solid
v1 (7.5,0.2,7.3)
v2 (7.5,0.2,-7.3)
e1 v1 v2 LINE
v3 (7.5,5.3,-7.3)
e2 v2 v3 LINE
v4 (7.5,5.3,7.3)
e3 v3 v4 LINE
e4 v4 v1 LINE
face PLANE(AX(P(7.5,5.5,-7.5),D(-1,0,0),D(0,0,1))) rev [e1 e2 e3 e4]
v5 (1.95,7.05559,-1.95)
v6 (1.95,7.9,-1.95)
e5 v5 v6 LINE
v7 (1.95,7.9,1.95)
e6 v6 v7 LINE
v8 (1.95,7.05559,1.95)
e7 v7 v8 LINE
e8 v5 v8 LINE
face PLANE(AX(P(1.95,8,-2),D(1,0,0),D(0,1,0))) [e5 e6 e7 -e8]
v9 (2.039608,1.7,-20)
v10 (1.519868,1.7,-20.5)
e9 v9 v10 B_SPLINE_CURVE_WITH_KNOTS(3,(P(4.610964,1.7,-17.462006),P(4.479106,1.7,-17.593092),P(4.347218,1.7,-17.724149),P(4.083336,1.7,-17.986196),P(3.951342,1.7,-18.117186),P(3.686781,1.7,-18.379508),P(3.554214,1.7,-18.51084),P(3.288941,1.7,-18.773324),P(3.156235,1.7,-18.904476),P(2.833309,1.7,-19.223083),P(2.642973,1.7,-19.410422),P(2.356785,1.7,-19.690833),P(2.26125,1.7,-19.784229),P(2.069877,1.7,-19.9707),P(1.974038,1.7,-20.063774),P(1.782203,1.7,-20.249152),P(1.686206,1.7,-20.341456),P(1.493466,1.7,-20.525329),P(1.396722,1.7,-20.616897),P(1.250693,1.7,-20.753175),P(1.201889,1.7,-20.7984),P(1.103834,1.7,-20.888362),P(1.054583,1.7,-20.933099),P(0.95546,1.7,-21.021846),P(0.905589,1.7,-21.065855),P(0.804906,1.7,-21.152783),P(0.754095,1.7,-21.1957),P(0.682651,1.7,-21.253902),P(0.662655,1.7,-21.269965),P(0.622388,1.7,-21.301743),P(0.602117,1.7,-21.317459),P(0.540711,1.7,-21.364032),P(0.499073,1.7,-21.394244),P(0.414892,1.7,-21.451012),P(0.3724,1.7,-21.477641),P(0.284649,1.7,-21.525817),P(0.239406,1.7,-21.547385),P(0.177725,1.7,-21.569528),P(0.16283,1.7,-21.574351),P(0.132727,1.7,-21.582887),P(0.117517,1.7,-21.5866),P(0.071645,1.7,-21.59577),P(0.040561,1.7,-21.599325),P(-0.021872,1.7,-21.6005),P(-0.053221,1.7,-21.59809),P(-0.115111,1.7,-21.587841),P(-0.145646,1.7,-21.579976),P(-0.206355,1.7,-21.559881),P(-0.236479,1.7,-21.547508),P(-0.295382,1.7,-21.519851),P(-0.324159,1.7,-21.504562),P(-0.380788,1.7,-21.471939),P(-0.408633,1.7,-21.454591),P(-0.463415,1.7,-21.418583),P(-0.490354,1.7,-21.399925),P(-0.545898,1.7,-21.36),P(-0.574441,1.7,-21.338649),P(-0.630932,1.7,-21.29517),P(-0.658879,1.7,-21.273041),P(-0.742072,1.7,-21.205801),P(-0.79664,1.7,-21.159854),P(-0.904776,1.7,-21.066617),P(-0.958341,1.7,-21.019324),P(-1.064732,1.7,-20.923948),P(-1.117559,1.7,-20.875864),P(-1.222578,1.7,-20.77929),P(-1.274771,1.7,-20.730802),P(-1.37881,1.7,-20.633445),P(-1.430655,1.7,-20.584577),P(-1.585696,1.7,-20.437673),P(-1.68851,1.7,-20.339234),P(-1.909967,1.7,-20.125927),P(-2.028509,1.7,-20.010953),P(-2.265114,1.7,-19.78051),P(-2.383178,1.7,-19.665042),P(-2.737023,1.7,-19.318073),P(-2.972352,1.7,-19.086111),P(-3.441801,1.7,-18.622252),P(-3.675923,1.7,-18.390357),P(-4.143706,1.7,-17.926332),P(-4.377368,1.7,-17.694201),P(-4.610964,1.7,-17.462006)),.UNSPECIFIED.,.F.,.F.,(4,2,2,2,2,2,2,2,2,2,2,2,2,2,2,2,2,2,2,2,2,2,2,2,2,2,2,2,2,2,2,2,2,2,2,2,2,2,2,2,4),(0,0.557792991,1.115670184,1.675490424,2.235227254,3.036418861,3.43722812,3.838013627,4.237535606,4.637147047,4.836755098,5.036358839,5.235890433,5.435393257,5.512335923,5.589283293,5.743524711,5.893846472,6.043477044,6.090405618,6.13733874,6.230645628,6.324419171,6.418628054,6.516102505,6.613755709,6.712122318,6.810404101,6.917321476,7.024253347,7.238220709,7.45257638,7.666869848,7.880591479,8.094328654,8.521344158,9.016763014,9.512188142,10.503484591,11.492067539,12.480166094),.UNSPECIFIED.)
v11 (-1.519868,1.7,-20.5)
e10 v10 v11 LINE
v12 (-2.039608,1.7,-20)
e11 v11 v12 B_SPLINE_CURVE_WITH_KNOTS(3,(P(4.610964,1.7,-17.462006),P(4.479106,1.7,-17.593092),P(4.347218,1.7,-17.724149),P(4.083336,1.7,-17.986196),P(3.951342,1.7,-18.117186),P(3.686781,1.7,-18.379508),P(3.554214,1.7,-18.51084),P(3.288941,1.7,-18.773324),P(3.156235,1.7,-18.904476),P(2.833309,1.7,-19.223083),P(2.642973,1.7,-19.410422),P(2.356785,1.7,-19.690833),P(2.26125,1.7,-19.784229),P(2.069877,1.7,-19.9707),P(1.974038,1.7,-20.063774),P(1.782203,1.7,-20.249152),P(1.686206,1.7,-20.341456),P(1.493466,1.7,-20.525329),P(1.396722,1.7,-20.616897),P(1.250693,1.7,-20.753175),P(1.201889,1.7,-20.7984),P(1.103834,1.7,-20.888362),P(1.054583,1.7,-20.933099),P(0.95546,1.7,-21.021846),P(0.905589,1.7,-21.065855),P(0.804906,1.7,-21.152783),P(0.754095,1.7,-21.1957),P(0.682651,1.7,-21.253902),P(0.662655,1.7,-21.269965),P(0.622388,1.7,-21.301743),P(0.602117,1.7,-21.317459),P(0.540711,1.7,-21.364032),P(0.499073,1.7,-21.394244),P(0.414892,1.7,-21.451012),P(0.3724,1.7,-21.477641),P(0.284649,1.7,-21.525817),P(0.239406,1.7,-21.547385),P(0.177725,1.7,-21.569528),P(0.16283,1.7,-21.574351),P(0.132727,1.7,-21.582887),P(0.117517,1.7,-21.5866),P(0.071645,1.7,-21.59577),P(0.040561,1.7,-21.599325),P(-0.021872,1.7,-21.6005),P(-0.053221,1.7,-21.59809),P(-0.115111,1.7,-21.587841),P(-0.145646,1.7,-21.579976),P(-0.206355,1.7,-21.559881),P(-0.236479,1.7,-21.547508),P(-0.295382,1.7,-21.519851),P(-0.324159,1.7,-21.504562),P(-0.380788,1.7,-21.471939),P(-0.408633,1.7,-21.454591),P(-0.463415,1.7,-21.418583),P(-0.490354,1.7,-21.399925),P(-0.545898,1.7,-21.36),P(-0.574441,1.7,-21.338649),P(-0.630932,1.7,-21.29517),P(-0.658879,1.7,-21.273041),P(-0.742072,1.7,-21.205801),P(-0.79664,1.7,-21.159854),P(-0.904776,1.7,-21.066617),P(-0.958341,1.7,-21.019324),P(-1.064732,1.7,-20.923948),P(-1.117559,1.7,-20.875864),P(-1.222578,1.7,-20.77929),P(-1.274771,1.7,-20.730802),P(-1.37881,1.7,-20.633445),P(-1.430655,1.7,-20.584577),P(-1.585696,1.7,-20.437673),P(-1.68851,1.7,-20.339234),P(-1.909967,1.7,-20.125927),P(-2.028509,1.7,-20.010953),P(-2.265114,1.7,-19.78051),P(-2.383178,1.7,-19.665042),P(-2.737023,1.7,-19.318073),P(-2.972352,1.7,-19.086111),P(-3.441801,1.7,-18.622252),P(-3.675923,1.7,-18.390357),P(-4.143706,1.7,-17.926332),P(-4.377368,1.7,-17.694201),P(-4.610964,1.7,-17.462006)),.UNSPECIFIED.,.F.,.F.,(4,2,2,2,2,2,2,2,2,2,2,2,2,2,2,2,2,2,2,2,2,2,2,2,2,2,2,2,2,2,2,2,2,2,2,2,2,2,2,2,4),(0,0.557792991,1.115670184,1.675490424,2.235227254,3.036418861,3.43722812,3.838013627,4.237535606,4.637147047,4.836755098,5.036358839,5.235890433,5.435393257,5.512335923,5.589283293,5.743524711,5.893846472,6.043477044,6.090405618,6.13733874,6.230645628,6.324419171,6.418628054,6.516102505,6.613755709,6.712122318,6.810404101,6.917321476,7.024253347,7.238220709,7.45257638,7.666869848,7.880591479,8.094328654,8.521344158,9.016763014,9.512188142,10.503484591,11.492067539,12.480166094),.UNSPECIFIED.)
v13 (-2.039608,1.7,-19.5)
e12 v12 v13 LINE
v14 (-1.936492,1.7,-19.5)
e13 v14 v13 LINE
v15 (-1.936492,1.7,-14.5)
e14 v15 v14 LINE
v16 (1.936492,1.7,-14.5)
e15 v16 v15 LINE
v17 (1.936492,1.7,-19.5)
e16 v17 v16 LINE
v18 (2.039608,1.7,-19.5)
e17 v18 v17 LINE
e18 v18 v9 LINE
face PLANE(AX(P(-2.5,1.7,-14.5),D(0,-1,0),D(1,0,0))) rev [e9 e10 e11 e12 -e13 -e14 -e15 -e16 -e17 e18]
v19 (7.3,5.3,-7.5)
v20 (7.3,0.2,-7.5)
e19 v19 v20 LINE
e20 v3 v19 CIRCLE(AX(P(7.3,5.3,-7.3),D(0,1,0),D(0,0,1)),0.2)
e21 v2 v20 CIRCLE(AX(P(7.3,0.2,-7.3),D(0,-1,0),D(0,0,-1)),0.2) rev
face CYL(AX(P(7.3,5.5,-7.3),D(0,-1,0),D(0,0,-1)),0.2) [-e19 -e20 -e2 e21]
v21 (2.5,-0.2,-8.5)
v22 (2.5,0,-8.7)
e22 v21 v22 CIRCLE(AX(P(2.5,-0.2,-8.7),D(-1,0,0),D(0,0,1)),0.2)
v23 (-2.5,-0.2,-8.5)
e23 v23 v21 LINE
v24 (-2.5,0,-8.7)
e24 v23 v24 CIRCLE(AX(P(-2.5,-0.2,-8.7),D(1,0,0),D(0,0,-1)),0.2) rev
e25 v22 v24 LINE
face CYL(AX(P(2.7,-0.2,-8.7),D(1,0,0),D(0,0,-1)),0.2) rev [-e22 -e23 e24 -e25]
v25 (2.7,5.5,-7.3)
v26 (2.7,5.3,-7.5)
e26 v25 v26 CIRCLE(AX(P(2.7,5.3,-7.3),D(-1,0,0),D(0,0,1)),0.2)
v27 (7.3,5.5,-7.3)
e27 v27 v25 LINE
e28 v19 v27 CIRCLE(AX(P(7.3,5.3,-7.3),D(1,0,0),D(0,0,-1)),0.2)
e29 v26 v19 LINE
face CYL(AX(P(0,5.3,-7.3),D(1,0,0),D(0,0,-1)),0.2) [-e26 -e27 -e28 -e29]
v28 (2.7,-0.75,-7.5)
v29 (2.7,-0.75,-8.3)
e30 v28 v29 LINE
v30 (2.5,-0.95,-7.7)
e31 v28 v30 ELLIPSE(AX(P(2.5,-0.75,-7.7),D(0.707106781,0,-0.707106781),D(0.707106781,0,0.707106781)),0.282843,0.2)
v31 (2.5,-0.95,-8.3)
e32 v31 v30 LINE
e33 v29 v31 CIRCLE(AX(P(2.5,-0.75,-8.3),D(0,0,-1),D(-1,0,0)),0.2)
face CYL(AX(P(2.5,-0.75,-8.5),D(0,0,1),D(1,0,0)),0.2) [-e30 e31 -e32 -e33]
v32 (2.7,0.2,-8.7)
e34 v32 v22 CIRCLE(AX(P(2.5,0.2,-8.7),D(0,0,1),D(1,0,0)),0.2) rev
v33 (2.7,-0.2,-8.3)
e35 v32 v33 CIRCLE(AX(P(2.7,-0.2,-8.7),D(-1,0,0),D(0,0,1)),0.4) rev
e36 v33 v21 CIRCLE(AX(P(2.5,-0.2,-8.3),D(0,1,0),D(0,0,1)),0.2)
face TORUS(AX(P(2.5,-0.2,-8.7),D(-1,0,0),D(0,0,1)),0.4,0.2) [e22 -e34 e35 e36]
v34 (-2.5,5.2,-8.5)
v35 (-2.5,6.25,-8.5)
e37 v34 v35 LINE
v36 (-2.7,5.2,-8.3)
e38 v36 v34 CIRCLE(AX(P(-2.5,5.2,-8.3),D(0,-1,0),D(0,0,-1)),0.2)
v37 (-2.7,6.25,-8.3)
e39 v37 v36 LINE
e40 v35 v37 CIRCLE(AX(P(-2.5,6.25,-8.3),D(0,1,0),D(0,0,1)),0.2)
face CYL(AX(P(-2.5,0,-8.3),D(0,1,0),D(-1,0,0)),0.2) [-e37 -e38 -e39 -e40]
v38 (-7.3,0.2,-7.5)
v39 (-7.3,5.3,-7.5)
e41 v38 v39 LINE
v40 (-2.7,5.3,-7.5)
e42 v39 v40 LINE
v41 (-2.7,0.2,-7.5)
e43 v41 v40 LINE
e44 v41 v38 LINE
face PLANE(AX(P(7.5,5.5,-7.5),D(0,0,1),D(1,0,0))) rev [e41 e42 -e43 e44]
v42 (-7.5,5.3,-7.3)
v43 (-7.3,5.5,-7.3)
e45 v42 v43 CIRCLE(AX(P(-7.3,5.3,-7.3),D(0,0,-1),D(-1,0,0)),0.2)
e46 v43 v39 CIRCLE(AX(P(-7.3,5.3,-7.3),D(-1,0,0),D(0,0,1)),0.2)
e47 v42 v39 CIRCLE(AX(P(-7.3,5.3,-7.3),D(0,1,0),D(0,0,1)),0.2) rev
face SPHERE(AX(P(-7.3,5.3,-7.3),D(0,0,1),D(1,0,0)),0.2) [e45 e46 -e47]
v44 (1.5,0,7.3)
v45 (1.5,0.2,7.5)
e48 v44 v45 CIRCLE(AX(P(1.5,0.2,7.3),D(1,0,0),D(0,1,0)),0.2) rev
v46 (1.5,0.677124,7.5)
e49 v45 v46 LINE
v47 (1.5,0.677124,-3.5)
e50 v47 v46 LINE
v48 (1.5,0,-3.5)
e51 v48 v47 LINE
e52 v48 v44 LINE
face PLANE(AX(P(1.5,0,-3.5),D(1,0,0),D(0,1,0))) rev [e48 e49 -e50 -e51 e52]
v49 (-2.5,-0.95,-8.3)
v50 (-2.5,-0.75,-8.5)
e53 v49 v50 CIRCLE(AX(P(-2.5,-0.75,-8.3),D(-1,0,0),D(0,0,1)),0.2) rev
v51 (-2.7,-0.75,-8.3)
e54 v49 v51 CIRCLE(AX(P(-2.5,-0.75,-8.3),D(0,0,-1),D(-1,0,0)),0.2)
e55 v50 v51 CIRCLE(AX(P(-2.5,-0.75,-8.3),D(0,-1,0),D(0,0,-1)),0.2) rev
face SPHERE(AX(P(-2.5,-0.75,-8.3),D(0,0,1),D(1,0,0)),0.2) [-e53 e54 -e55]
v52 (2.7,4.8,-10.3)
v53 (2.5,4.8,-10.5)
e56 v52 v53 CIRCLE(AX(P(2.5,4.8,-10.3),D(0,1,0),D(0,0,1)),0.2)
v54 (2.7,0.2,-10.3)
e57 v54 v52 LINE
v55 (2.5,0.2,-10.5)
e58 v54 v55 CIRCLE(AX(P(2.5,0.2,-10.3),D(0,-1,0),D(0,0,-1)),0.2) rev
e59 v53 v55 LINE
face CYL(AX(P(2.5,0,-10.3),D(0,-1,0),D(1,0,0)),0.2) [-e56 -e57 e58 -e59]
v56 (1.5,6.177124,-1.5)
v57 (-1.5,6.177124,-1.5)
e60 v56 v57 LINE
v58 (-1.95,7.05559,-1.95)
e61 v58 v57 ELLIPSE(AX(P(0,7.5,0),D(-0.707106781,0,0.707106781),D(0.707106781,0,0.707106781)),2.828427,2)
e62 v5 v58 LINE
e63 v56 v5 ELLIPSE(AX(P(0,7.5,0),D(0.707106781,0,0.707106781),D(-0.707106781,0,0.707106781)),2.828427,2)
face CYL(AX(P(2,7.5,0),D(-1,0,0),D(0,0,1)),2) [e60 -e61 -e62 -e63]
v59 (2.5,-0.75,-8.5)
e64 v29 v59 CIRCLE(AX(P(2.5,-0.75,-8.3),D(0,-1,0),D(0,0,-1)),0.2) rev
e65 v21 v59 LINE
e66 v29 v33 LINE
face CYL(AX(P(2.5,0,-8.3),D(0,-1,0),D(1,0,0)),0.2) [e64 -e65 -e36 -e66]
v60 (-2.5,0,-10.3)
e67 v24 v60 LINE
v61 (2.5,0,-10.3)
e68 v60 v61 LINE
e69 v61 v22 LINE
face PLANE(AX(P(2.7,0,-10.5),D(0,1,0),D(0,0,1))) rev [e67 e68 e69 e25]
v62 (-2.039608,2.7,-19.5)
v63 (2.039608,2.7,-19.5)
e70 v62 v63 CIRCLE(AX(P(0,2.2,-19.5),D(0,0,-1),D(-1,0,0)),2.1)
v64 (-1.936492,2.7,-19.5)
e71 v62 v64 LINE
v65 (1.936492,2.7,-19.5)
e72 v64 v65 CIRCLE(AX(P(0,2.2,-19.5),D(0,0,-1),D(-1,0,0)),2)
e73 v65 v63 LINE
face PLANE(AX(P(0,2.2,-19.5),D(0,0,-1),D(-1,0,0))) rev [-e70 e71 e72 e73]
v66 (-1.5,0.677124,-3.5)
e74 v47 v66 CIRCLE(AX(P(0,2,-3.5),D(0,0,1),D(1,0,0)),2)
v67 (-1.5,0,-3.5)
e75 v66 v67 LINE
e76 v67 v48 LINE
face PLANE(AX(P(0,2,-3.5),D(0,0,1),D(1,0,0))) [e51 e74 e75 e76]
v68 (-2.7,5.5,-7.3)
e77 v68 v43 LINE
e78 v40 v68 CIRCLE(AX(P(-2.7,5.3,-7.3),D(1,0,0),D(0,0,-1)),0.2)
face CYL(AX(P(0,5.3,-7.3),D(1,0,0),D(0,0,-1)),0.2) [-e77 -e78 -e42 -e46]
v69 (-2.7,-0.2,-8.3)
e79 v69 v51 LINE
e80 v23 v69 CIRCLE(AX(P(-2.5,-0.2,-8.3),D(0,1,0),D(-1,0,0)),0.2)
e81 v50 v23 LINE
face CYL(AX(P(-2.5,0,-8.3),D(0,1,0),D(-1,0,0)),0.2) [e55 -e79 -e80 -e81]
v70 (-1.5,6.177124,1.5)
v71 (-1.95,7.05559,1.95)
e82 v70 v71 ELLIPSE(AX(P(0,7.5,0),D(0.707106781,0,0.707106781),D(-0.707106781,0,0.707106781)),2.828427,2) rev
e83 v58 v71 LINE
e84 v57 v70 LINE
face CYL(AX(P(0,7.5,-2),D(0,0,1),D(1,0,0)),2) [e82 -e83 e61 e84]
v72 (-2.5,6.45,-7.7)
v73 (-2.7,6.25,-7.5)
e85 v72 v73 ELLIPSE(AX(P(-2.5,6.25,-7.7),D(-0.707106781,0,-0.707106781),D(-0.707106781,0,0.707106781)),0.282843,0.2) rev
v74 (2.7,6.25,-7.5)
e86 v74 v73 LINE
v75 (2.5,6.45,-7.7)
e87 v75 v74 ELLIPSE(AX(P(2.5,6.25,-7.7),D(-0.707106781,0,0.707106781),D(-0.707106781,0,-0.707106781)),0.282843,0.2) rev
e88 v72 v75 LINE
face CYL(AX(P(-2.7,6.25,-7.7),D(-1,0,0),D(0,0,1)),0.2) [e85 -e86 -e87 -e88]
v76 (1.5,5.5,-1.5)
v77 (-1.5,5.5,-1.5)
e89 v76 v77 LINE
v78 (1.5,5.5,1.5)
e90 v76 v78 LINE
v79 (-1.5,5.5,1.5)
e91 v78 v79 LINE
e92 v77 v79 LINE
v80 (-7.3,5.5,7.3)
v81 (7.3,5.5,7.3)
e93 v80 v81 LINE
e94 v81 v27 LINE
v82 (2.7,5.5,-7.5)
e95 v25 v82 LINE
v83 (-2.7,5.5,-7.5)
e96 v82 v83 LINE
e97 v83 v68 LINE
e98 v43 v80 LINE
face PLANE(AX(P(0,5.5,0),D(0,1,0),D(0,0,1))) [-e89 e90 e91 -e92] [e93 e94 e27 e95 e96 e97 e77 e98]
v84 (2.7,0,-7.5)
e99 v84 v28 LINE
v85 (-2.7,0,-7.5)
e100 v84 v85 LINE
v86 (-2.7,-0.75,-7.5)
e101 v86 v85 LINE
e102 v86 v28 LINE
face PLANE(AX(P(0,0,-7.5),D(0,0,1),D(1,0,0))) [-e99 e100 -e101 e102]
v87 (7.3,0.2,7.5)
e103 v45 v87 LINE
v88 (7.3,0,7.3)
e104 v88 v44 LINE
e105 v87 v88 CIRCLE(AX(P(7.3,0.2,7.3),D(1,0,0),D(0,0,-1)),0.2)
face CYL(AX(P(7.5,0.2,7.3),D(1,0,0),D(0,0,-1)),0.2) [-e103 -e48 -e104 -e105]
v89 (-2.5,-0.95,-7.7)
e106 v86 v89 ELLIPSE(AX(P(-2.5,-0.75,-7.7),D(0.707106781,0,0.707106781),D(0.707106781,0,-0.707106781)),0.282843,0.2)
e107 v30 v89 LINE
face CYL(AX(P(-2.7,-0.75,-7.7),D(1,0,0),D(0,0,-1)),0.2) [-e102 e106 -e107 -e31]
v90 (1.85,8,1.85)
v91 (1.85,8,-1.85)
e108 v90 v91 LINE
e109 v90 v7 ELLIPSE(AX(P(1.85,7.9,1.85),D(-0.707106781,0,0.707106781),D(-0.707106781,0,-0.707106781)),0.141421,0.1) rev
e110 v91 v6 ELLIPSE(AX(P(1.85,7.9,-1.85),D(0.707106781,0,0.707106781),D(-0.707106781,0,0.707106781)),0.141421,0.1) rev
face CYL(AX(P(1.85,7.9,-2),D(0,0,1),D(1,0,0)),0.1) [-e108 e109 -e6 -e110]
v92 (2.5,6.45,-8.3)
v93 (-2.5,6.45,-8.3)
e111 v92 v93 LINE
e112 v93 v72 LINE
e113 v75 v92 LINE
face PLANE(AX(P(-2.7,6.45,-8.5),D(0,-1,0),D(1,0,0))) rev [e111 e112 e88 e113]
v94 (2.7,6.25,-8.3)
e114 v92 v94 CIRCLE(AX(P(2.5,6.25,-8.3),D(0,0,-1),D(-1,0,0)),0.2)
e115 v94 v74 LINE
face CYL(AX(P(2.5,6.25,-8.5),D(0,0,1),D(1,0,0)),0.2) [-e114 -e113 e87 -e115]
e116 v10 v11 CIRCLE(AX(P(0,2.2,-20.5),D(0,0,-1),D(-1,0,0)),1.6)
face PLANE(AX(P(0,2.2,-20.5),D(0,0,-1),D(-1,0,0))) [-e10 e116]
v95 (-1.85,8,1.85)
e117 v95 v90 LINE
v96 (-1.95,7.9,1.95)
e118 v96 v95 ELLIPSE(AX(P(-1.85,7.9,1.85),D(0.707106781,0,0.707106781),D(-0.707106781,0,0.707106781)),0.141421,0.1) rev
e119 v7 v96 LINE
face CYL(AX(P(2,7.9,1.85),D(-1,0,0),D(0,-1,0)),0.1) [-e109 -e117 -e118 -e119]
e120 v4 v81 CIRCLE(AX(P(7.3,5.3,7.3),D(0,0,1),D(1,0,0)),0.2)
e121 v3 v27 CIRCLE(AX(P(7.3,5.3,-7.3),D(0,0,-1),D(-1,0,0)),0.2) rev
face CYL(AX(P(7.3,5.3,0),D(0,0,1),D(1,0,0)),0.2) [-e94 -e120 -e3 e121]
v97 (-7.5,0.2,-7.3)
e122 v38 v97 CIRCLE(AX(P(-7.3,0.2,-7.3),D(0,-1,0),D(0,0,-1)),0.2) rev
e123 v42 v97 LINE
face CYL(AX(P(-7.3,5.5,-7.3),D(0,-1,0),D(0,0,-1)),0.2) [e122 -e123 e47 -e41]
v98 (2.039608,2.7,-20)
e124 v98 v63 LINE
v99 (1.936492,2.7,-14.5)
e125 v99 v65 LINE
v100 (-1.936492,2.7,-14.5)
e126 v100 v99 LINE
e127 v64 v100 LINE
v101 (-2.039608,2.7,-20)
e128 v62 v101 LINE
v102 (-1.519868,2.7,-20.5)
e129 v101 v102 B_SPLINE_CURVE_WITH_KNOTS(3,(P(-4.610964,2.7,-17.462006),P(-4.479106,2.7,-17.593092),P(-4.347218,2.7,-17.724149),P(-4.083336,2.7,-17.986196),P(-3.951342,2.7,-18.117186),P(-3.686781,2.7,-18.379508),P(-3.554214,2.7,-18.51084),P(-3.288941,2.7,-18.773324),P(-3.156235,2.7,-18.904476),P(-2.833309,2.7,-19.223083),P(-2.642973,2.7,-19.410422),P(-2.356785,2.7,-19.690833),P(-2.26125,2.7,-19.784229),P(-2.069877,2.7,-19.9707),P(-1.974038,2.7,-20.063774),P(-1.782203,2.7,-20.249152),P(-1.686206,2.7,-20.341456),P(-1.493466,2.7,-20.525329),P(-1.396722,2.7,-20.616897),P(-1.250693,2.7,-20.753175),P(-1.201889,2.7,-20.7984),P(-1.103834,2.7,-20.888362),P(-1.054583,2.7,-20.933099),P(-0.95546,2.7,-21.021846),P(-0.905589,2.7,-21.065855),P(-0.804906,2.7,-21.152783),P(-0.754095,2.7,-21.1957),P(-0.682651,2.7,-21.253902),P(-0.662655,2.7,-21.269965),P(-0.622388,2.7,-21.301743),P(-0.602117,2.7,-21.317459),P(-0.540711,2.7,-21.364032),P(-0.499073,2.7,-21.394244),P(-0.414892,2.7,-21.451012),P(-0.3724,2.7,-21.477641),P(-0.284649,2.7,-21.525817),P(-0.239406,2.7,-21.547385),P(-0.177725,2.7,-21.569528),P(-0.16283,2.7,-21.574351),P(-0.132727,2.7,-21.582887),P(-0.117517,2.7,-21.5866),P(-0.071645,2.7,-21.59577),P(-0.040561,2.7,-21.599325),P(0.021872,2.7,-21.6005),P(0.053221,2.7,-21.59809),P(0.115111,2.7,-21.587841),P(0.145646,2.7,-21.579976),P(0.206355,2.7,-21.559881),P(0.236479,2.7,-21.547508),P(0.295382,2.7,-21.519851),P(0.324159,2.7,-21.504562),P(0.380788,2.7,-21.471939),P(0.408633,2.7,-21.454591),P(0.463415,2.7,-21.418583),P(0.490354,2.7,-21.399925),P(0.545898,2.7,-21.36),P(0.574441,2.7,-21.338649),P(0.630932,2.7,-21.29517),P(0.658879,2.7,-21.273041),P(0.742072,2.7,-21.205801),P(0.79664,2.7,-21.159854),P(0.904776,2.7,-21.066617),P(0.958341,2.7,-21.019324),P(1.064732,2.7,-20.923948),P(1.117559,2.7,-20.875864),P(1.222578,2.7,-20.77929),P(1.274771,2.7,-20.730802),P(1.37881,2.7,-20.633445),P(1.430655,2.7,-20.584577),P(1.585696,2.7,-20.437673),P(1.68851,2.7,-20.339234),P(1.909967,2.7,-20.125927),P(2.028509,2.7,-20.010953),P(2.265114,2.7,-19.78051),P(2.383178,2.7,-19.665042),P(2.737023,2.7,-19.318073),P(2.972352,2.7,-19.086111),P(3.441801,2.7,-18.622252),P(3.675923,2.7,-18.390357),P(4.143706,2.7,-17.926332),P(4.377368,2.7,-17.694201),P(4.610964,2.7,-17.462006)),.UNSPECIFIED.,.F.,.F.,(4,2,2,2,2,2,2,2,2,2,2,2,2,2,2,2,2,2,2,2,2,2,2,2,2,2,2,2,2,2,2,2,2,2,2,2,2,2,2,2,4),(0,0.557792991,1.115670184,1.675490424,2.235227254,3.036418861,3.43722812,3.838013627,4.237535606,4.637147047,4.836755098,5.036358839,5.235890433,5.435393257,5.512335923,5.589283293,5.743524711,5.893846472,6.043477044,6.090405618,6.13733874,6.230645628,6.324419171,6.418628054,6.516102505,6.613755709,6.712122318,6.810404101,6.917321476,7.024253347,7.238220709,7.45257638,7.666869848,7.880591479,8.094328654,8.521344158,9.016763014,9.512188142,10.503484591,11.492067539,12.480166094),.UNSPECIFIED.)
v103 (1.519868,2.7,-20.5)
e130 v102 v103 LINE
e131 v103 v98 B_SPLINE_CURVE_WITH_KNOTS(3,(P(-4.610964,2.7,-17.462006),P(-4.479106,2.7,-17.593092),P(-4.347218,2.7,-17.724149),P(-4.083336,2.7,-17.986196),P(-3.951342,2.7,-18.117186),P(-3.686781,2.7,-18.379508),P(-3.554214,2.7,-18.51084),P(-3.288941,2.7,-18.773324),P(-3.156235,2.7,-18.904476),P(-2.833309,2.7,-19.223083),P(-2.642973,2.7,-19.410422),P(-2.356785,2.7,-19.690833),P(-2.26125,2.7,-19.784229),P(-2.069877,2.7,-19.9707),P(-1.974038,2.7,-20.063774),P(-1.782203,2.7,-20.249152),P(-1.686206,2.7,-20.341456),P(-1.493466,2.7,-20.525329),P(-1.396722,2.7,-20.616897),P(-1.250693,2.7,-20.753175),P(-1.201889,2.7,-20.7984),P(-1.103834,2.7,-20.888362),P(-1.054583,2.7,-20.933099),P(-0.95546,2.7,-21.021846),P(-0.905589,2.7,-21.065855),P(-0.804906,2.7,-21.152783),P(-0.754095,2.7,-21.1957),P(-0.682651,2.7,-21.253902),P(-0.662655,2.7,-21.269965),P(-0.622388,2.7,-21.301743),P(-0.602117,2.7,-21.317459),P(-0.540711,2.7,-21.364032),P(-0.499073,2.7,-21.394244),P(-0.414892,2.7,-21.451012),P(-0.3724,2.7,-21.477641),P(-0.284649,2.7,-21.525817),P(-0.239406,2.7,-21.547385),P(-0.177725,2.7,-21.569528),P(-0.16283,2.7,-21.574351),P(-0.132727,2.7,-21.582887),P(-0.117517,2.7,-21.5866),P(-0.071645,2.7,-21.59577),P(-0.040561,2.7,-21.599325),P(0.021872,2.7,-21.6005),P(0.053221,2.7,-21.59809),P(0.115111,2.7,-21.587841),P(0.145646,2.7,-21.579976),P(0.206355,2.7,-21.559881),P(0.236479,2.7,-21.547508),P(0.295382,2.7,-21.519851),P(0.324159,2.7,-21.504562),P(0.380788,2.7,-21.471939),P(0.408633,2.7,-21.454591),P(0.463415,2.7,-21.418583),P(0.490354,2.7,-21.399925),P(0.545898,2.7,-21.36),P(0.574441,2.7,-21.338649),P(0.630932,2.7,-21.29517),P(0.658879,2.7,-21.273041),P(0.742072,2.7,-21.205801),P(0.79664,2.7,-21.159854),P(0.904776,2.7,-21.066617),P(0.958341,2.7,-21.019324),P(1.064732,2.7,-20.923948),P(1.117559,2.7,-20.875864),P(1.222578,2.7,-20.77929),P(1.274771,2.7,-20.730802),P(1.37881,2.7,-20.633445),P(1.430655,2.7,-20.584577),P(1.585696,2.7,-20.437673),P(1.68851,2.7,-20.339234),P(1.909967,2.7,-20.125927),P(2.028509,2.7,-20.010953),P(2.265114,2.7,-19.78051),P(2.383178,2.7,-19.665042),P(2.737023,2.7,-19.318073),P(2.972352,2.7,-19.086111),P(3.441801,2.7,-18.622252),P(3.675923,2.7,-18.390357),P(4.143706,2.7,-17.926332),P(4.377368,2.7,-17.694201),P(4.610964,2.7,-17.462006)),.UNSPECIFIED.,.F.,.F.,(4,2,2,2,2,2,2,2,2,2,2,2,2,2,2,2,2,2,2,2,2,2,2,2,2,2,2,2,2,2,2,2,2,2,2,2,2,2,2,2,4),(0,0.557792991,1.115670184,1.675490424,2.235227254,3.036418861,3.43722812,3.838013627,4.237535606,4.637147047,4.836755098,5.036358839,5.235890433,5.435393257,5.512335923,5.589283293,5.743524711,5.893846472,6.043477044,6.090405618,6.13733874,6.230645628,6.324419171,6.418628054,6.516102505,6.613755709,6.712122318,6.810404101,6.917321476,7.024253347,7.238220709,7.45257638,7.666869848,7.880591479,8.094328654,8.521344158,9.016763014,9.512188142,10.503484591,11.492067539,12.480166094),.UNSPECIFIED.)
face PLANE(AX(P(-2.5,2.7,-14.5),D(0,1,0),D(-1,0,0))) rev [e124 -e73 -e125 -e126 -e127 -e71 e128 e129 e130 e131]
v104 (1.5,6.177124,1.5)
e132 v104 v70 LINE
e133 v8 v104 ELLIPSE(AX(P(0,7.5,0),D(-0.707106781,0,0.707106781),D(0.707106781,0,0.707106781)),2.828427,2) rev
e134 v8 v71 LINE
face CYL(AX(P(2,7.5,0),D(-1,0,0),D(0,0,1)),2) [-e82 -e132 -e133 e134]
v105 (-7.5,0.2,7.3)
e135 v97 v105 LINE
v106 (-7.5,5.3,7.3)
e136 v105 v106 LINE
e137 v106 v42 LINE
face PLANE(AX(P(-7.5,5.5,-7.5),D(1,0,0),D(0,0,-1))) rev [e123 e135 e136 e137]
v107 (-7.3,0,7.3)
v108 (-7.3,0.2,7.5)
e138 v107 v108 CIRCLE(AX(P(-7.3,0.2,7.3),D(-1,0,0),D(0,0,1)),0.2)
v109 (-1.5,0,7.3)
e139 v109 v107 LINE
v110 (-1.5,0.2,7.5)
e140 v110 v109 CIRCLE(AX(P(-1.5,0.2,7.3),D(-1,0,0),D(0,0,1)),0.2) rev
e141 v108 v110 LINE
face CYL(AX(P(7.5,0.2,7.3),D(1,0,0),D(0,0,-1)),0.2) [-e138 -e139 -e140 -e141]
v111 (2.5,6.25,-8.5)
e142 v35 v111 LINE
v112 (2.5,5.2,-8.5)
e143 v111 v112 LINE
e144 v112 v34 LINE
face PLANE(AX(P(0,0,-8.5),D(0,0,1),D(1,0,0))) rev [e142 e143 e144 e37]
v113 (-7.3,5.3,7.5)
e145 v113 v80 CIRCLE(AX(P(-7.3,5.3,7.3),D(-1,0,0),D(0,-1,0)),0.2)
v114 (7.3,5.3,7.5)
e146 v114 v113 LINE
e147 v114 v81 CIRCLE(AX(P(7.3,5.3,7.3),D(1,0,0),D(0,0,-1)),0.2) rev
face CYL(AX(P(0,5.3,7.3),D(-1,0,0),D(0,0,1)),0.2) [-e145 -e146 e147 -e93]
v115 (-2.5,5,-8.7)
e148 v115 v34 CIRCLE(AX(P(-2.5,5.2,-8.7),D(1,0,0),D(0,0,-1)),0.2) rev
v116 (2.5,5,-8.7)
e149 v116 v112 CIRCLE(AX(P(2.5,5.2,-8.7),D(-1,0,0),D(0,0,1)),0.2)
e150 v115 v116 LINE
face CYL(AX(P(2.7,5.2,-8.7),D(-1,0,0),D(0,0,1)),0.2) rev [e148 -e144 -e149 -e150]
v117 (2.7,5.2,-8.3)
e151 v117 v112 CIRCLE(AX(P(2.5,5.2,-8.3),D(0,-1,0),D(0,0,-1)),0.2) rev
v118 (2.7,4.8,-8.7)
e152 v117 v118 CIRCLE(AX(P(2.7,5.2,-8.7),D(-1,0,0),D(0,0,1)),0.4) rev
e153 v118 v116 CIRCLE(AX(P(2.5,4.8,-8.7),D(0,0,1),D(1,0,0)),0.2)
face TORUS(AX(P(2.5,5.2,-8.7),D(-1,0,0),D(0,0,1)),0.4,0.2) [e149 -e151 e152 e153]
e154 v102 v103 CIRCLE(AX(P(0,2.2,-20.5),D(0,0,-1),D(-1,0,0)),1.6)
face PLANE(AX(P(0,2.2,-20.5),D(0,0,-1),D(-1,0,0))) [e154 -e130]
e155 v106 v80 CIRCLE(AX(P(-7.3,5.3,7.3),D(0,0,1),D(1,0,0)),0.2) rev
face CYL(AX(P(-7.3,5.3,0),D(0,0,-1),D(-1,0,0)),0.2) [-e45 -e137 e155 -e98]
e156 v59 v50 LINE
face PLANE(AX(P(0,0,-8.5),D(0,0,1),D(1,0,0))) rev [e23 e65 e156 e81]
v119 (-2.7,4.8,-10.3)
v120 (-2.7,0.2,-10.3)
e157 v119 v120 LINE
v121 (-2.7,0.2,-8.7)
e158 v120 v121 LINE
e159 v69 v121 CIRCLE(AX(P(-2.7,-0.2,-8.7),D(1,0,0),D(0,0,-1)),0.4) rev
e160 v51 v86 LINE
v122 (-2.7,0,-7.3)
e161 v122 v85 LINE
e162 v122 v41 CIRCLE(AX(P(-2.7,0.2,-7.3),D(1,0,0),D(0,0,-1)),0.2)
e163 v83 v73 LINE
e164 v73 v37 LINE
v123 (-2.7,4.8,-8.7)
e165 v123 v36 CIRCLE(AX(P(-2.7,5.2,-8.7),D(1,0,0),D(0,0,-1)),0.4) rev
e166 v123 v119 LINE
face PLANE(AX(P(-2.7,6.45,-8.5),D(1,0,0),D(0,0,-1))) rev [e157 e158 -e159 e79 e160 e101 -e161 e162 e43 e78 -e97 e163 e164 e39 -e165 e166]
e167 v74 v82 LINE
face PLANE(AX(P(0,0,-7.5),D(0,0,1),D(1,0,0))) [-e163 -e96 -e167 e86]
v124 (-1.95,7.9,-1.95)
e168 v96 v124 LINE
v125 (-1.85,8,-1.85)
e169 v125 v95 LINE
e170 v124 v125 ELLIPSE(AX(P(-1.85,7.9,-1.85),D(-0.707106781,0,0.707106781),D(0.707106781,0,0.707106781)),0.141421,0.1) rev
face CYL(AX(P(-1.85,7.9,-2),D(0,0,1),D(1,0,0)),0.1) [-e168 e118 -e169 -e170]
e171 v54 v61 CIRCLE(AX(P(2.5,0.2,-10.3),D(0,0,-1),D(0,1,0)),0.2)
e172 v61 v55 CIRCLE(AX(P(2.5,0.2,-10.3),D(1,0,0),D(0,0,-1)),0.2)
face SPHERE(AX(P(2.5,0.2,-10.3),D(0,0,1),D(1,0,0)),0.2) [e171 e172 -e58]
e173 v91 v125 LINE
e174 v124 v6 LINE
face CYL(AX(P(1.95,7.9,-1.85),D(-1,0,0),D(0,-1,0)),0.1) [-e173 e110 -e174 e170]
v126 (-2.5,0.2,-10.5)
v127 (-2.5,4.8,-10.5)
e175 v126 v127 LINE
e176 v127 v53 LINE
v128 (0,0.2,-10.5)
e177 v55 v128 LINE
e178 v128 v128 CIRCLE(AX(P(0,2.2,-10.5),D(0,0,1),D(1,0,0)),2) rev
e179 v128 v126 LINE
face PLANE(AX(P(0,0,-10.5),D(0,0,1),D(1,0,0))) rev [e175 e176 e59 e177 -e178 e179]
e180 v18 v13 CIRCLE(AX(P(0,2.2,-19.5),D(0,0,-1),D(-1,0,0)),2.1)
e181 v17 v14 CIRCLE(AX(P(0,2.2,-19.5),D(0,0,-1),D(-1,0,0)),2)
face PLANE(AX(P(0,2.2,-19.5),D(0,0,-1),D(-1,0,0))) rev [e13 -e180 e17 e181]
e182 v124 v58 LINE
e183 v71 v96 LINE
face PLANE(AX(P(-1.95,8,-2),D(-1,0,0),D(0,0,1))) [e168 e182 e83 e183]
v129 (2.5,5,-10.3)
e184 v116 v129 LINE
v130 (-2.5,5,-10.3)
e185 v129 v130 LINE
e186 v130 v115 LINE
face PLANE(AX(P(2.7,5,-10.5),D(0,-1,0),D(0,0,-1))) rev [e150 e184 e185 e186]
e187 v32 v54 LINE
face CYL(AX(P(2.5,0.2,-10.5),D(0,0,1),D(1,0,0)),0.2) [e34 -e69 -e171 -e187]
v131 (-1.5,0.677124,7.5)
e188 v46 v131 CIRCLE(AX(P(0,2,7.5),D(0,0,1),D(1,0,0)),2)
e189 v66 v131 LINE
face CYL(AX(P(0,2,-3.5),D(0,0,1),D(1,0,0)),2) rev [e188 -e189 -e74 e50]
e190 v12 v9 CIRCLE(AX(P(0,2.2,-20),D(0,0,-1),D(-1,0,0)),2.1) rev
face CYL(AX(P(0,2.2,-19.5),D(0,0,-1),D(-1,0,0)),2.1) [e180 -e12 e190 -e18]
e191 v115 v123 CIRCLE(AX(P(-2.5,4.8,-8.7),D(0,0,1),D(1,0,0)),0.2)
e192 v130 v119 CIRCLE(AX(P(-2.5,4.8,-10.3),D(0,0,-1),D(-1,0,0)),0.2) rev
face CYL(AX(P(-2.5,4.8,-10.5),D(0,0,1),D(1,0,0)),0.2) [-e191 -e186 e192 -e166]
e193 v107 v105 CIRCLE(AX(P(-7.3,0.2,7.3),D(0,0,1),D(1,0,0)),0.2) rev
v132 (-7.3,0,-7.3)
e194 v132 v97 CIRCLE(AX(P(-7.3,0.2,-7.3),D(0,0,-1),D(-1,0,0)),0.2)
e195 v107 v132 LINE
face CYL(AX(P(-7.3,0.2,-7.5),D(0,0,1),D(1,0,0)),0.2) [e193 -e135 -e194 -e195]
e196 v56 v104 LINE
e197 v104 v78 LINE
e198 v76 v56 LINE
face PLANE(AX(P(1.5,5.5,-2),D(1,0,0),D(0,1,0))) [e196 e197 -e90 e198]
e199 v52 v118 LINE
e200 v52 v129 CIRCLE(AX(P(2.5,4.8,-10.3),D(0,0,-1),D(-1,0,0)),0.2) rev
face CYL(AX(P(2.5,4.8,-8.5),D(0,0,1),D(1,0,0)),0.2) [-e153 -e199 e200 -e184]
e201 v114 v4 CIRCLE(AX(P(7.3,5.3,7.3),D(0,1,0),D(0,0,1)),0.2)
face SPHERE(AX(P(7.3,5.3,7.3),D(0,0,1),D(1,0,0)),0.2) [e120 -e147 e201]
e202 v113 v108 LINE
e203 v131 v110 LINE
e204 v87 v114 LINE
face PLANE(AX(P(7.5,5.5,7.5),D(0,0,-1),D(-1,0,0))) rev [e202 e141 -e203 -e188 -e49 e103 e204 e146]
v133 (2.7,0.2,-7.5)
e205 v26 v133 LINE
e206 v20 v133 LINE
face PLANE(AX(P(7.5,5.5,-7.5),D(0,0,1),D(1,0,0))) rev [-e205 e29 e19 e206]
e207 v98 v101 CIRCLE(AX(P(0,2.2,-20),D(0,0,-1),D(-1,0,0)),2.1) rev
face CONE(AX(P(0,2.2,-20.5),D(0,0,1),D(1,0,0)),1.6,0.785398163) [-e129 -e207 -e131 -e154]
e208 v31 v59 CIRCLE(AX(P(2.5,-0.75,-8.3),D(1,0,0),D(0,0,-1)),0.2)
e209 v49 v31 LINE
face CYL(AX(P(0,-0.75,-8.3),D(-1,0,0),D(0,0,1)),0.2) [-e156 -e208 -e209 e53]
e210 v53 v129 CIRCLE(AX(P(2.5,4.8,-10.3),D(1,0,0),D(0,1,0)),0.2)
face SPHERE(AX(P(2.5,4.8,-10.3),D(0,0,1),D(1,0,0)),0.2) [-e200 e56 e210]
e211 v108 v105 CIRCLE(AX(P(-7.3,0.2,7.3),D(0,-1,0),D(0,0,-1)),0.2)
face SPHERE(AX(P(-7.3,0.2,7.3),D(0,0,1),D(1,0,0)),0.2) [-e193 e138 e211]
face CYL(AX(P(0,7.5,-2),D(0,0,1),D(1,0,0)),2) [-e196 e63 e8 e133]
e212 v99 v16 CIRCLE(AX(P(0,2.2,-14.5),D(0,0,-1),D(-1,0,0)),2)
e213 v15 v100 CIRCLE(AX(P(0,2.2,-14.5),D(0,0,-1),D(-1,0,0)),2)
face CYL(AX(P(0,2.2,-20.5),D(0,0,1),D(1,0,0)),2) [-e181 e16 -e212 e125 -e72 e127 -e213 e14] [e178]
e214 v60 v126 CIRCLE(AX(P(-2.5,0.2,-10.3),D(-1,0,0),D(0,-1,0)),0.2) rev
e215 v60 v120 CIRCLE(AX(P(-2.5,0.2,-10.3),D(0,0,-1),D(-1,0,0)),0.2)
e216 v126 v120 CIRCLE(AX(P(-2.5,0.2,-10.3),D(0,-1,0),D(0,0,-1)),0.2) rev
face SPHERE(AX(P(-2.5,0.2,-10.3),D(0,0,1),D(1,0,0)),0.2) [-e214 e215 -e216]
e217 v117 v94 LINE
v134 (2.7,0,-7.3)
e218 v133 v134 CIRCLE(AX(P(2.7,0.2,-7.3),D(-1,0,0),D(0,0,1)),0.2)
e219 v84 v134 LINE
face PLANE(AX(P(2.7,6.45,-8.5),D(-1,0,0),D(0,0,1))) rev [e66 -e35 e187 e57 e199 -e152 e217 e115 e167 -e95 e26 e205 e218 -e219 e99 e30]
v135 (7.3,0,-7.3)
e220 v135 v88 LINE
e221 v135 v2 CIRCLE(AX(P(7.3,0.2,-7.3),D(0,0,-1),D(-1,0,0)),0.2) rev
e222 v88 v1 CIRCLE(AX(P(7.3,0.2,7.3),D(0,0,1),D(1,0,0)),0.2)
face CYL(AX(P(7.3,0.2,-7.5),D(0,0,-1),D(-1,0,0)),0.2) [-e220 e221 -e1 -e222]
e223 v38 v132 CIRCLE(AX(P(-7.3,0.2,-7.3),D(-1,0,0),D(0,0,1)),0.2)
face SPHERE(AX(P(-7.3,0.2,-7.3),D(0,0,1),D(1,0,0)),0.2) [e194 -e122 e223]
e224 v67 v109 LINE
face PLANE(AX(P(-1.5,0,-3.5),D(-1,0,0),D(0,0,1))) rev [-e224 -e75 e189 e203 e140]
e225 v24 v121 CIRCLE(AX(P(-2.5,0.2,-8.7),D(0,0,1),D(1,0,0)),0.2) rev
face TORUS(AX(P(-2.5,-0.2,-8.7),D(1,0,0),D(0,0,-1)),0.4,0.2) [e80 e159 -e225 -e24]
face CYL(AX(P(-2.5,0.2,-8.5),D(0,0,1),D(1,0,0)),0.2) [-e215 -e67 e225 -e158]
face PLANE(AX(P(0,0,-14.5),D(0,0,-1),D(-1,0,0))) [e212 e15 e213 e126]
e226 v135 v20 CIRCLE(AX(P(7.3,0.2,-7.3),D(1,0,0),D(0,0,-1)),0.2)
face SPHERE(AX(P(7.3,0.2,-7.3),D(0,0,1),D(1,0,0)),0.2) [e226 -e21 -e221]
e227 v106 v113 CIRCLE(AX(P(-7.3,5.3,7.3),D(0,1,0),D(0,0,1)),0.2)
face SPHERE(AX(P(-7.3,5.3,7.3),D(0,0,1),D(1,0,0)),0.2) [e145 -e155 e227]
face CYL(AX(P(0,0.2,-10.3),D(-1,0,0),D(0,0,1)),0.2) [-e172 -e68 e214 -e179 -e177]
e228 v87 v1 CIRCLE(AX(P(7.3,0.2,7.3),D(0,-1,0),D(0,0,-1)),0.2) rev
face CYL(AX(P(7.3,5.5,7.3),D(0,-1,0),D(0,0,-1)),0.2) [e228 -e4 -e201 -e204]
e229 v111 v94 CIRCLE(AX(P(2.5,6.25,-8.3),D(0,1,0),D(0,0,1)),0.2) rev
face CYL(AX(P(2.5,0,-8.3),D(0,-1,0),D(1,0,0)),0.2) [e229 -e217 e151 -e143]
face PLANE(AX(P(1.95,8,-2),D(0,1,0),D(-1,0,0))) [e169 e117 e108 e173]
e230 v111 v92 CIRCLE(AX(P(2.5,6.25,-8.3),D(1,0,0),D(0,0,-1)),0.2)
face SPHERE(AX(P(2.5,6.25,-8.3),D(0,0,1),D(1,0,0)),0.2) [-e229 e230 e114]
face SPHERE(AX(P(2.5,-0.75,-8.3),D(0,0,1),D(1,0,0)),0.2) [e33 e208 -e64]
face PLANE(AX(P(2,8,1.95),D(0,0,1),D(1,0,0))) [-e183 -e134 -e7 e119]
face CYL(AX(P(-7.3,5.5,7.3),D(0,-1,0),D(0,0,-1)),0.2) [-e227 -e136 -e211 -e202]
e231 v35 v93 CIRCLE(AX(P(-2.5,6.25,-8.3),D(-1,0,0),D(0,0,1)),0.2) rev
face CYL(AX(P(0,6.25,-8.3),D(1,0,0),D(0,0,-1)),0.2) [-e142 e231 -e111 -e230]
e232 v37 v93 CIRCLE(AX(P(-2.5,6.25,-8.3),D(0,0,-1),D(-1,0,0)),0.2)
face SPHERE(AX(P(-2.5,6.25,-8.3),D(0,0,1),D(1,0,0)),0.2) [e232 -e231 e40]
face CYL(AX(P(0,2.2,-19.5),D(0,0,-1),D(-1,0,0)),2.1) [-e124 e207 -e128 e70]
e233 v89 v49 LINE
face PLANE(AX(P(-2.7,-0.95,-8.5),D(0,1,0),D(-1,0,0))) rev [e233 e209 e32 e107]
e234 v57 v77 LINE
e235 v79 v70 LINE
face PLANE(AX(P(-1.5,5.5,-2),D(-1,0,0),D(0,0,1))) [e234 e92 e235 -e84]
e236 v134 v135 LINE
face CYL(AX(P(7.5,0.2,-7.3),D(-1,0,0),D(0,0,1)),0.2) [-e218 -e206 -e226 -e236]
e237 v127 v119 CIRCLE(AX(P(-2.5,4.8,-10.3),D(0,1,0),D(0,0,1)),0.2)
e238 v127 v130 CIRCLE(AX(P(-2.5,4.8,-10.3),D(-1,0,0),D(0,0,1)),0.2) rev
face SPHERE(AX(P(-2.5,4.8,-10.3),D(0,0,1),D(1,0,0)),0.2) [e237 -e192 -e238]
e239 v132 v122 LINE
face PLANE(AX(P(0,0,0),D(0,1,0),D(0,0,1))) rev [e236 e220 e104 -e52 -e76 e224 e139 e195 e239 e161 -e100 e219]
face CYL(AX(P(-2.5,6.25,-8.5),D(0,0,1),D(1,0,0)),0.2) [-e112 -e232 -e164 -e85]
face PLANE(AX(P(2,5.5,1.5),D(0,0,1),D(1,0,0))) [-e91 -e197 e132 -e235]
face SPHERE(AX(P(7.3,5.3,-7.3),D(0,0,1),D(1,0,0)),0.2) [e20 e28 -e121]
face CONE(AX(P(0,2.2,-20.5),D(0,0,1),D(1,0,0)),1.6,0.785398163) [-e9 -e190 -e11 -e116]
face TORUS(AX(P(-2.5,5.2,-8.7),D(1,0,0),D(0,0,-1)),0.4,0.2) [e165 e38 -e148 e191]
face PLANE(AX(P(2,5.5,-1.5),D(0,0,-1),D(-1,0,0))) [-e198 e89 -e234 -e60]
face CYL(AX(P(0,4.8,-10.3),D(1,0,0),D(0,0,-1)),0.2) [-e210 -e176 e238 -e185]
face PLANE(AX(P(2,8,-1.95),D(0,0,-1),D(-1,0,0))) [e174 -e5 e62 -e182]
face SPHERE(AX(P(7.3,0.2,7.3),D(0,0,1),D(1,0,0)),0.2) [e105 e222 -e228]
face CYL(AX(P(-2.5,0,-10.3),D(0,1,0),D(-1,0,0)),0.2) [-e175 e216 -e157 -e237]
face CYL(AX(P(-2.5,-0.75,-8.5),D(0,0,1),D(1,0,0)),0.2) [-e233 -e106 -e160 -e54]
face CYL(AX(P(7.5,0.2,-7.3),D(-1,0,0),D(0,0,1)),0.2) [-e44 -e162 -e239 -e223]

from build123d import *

# Parameters (mm, degrees)
SKETCH_1_W               = 15
SKETCH_1_H               = 15
EXTRUDE_1_DEPTH          = 5.5
CUT_EXTRUDE_1_DEPTH      = 11
EXTRUDE_2_DEPTH          = 2
EXTRUDE_2_DEPTH_BACK     = 2
CUT_EXTRUDE_2_DEPTH      = 2
CUT_EXTRUDE_2_DEPTH_BACK = 2
SKETCH_5_W               = 5.4
SKETCH_5_H               = 7.4
EXTRUDE_3_DEPTH          = 1
SKETCH_6_W               = 5.4
SKETCH_6_H               = 5
EXTRUDE_4_DEPTH          = 2
SKETCH_7_R               = 2
EXTRUDE_5_DEPTH          = 10
SKETCH_8_R               = 2.1
EXTRUDE_6_DEPTH          = 1
CHAMFER_1_SIZE           = 0.5
SKETCH_9_W               = 5
SKETCH_9_H               = 1
CUT_EXTRUDE_3_DEPTH      = 6
FILLET_1_R               = 0.1
FILLET_2_R               = 0.2


with BuildPart() as part:
    # 草图1 → 凸台-拉伸1 (new body)
    with BuildSketch(Plane(origin=(0, 0, 0), x_dir=(1, 0, 0), z_dir=(0, 1, 0))):
        Rectangle(SKETCH_1_W, SKETCH_1_H)
    extrude(amount=EXTRUDE_1_DEPTH)

    # 草图2 → 切除-拉伸1 (cut)
    with BuildSketch(Plane.XY.offset(7.5)):
        with BuildLine():
            Line((1.5, 0), (-1.5, 0))
            Line((-1.5, 0), (-1.5, 0.677124344))
            ThreePointArc((-1.5, 0.677124344), (0, 4), (1.5, 0.677124344))
            Line((1.5, 0.677124344), (1.5, 0))
        make_face()
    extrude(amount=-CUT_EXTRUDE_1_DEPTH, mode=Mode.SUBTRACT)

    # 草图3 → 凸台-拉伸2 (add, two sides: drawn at the far end of the back side and taken through both)
    with BuildSketch(Plane.XY.offset(-EXTRUDE_2_DEPTH_BACK)):
        with BuildLine():
            Line((1.5, 5.5), (-1.5, 5.5))
            Line((-1.5, 5.5), (-1.5, 6.177124344))
            ThreePointArc((-1.5, 6.177124344), (-1.780042303, 6.588161527), (-1.95, 7.055590279))
            Line((-1.95, 7.055590279), (-1.95, 8))
            Line((-1.95, 8), (1.95, 8))
            Line((1.95, 8), (1.95, 7.055590279))
            ThreePointArc((1.95, 7.055590279), (1.780042303, 6.588161527), (1.5, 6.177124344))
            Line((1.5, 6.177124344), (1.5, 5.5))
        make_face()
    extrude(amount=EXTRUDE_2_DEPTH + EXTRUDE_2_DEPTH_BACK)

    # 草图4 → 切除-拉伸2 (cut, two sides: drawn at the far end of the back side and taken through both)
    with BuildSketch(Plane(origin=(0, 0, 0), x_dir=(0, 0, -1), z_dir=(1, 0, 0)).offset(-CUT_EXTRUDE_2_DEPTH_BACK)):
        with BuildLine():
            Line((-1.5, 5.5), (-1.5, 6.177124344))
            ThreePointArc((-1.5, 6.177124344), (-1.780042303, 6.588161527), (-1.95, 7.055590279))
            Line((-1.95, 7.055590279), (-1.95, 8))
            Line((-1.95, 8), (-2, 8))
            Line((-2, 8), (-2, 5.5))
            Line((-2, 5.5), (-1.5, 5.5))
        make_face()
        with BuildLine():
            Line((2, 5.5), (1.5, 5.5))
            Line((1.5, 5.5), (1.5, 6.177124344))
            ThreePointArc((1.5, 6.177124344), (1.780042303, 6.588161527), (1.95, 7.055590279))
            Line((1.95, 7.055590279), (1.95, 8))
            Line((1.95, 8), (2, 8))
            Line((2, 8), (2, 5.5))
        make_face()
    extrude(amount=CUT_EXTRUDE_2_DEPTH + CUT_EXTRUDE_2_DEPTH_BACK, mode=Mode.SUBTRACT)

    # 草图5 → 凸台-拉伸3 (add)
    with BuildSketch(Plane(origin=(0, 0, -7.5), x_dir=(-1, 0, 0), z_dir=(0, 0, -1))):
        with Locations((0, 2.75)):
            Rectangle(SKETCH_5_W, SKETCH_5_H)
    extrude(amount=EXTRUDE_3_DEPTH)

    # 草图6 → 凸台-拉伸4 (add)
    with BuildSketch(Plane(origin=(0, 0, -8.5), x_dir=(-1, 0, 0), z_dir=(0, 0, -1))):
        with Locations((0, 2.5)):
            Rectangle(SKETCH_6_W, SKETCH_6_H)
    extrude(amount=EXTRUDE_4_DEPTH)

    # 草图7 → 凸台-拉伸5 (add)
    with BuildSketch(Plane(origin=(0, 0, -10.5), x_dir=(-1, 0, 0), z_dir=(0, 0, -1))):
        with Locations(Location((0, 2.2, 0), (0, 0, 180))):
            Circle(SKETCH_7_R)
    extrude(amount=EXTRUDE_5_DEPTH)

    # 草图8 → 凸台-拉伸6 (add)
    with BuildSketch(Plane(origin=(0, 0, -20.5), x_dir=(-1, 0, 0), z_dir=(0, 0, -1))):
        with Locations((0, 2.2)):
            Circle(SKETCH_8_R)
    extrude(amount=-EXTRUDE_6_DEPTH)

    # 倒角1
    chamfer_1_edges = [part.edges().sort_by_distance(p)[0] for p in [
        (2.1, 2.2, -20.5),
    ]]
    chamfer(chamfer_1_edges, length=CHAMFER_1_SIZE)

    # 草图9 → 切除-拉伸3 (cut)
    with BuildSketch(Plane(origin=(0, 0, -20.5), x_dir=(-1, 0, 0), z_dir=(0, 0, -1))):
        with Locations((0, 2.2)):
            Rectangle(SKETCH_9_W, SKETCH_9_H)
    extrude(amount=-CUT_EXTRUDE_3_DEPTH, mode=Mode.SUBTRACT)

    # 圆角1
    fillet_1_edges = [part.edges().sort_by_distance(p)[0] for p in [
        (1.95, 8, 0),
        (-1.95, 8, 0),
        (0, 8, -1.95),
        (0, 8, 1.95),
    ]]
    fillet(fillet_1_edges, radius=FILLET_1_R)

    # 圆角2
    fillet_2_edges = [part.edges().sort_by_distance(p)[0] for p in [
        (0, 5.5, 7.5),
        (-5.1, 0, -7.5),
        (-5.1, 5.5, -7.5),
        (-2.7, -0.95, -8),
        (0, 6.45, -7.5),
        (-2.7, 6.45, -8),
        (2.7, 6.45, -8),
        (0, -0.95, -7.5),
        (2.7, -0.95, -8),
        (-2.7, -0.475, -8.5),
        (0, 6.45, -8.5),
        (2.7, 5.725, -8.5),
        (0, -0.95, -8.5),
        (7.5, 5.5, 0),
        (-2.7, 5.725, -8.5),
        (2.7, -0.475, -8.5),
        (4.5, 0, 7.5),
        (2.7, 5, -9.5),
        (0, 0, -8.5),
        (2.7, 0, -9.5),
        (-2.7, 0, -9.5),
        (0, 5, -8.5),
        (-2.7, 5, -9.5),
        (2.7, 2.5, -10.5),
        (0, 0, -10.5),
        (-2.7, 2.5, -10.5),
        (0, 5, -10.5),
        (5.1, 5.5, -7.5),
        (7.5, 0, 0),
        (-4.5, 0, 7.5),
        (-7.5, 0, 0),
        (5.1, 0, -7.5),
        (-7.5, 5.5, 0),
        (7.5, 2.75, -7.5),
        (7.5, 2.75, 7.5),
        (-7.5, 2.75, 7.5),
        (-7.5, 2.75, -7.5),
    ]]
    fillet(fillet_2_edges, radius=FILLET_2_R - 0.0001)  # a hair under: the kernel refuses the full size


solid = part.part
